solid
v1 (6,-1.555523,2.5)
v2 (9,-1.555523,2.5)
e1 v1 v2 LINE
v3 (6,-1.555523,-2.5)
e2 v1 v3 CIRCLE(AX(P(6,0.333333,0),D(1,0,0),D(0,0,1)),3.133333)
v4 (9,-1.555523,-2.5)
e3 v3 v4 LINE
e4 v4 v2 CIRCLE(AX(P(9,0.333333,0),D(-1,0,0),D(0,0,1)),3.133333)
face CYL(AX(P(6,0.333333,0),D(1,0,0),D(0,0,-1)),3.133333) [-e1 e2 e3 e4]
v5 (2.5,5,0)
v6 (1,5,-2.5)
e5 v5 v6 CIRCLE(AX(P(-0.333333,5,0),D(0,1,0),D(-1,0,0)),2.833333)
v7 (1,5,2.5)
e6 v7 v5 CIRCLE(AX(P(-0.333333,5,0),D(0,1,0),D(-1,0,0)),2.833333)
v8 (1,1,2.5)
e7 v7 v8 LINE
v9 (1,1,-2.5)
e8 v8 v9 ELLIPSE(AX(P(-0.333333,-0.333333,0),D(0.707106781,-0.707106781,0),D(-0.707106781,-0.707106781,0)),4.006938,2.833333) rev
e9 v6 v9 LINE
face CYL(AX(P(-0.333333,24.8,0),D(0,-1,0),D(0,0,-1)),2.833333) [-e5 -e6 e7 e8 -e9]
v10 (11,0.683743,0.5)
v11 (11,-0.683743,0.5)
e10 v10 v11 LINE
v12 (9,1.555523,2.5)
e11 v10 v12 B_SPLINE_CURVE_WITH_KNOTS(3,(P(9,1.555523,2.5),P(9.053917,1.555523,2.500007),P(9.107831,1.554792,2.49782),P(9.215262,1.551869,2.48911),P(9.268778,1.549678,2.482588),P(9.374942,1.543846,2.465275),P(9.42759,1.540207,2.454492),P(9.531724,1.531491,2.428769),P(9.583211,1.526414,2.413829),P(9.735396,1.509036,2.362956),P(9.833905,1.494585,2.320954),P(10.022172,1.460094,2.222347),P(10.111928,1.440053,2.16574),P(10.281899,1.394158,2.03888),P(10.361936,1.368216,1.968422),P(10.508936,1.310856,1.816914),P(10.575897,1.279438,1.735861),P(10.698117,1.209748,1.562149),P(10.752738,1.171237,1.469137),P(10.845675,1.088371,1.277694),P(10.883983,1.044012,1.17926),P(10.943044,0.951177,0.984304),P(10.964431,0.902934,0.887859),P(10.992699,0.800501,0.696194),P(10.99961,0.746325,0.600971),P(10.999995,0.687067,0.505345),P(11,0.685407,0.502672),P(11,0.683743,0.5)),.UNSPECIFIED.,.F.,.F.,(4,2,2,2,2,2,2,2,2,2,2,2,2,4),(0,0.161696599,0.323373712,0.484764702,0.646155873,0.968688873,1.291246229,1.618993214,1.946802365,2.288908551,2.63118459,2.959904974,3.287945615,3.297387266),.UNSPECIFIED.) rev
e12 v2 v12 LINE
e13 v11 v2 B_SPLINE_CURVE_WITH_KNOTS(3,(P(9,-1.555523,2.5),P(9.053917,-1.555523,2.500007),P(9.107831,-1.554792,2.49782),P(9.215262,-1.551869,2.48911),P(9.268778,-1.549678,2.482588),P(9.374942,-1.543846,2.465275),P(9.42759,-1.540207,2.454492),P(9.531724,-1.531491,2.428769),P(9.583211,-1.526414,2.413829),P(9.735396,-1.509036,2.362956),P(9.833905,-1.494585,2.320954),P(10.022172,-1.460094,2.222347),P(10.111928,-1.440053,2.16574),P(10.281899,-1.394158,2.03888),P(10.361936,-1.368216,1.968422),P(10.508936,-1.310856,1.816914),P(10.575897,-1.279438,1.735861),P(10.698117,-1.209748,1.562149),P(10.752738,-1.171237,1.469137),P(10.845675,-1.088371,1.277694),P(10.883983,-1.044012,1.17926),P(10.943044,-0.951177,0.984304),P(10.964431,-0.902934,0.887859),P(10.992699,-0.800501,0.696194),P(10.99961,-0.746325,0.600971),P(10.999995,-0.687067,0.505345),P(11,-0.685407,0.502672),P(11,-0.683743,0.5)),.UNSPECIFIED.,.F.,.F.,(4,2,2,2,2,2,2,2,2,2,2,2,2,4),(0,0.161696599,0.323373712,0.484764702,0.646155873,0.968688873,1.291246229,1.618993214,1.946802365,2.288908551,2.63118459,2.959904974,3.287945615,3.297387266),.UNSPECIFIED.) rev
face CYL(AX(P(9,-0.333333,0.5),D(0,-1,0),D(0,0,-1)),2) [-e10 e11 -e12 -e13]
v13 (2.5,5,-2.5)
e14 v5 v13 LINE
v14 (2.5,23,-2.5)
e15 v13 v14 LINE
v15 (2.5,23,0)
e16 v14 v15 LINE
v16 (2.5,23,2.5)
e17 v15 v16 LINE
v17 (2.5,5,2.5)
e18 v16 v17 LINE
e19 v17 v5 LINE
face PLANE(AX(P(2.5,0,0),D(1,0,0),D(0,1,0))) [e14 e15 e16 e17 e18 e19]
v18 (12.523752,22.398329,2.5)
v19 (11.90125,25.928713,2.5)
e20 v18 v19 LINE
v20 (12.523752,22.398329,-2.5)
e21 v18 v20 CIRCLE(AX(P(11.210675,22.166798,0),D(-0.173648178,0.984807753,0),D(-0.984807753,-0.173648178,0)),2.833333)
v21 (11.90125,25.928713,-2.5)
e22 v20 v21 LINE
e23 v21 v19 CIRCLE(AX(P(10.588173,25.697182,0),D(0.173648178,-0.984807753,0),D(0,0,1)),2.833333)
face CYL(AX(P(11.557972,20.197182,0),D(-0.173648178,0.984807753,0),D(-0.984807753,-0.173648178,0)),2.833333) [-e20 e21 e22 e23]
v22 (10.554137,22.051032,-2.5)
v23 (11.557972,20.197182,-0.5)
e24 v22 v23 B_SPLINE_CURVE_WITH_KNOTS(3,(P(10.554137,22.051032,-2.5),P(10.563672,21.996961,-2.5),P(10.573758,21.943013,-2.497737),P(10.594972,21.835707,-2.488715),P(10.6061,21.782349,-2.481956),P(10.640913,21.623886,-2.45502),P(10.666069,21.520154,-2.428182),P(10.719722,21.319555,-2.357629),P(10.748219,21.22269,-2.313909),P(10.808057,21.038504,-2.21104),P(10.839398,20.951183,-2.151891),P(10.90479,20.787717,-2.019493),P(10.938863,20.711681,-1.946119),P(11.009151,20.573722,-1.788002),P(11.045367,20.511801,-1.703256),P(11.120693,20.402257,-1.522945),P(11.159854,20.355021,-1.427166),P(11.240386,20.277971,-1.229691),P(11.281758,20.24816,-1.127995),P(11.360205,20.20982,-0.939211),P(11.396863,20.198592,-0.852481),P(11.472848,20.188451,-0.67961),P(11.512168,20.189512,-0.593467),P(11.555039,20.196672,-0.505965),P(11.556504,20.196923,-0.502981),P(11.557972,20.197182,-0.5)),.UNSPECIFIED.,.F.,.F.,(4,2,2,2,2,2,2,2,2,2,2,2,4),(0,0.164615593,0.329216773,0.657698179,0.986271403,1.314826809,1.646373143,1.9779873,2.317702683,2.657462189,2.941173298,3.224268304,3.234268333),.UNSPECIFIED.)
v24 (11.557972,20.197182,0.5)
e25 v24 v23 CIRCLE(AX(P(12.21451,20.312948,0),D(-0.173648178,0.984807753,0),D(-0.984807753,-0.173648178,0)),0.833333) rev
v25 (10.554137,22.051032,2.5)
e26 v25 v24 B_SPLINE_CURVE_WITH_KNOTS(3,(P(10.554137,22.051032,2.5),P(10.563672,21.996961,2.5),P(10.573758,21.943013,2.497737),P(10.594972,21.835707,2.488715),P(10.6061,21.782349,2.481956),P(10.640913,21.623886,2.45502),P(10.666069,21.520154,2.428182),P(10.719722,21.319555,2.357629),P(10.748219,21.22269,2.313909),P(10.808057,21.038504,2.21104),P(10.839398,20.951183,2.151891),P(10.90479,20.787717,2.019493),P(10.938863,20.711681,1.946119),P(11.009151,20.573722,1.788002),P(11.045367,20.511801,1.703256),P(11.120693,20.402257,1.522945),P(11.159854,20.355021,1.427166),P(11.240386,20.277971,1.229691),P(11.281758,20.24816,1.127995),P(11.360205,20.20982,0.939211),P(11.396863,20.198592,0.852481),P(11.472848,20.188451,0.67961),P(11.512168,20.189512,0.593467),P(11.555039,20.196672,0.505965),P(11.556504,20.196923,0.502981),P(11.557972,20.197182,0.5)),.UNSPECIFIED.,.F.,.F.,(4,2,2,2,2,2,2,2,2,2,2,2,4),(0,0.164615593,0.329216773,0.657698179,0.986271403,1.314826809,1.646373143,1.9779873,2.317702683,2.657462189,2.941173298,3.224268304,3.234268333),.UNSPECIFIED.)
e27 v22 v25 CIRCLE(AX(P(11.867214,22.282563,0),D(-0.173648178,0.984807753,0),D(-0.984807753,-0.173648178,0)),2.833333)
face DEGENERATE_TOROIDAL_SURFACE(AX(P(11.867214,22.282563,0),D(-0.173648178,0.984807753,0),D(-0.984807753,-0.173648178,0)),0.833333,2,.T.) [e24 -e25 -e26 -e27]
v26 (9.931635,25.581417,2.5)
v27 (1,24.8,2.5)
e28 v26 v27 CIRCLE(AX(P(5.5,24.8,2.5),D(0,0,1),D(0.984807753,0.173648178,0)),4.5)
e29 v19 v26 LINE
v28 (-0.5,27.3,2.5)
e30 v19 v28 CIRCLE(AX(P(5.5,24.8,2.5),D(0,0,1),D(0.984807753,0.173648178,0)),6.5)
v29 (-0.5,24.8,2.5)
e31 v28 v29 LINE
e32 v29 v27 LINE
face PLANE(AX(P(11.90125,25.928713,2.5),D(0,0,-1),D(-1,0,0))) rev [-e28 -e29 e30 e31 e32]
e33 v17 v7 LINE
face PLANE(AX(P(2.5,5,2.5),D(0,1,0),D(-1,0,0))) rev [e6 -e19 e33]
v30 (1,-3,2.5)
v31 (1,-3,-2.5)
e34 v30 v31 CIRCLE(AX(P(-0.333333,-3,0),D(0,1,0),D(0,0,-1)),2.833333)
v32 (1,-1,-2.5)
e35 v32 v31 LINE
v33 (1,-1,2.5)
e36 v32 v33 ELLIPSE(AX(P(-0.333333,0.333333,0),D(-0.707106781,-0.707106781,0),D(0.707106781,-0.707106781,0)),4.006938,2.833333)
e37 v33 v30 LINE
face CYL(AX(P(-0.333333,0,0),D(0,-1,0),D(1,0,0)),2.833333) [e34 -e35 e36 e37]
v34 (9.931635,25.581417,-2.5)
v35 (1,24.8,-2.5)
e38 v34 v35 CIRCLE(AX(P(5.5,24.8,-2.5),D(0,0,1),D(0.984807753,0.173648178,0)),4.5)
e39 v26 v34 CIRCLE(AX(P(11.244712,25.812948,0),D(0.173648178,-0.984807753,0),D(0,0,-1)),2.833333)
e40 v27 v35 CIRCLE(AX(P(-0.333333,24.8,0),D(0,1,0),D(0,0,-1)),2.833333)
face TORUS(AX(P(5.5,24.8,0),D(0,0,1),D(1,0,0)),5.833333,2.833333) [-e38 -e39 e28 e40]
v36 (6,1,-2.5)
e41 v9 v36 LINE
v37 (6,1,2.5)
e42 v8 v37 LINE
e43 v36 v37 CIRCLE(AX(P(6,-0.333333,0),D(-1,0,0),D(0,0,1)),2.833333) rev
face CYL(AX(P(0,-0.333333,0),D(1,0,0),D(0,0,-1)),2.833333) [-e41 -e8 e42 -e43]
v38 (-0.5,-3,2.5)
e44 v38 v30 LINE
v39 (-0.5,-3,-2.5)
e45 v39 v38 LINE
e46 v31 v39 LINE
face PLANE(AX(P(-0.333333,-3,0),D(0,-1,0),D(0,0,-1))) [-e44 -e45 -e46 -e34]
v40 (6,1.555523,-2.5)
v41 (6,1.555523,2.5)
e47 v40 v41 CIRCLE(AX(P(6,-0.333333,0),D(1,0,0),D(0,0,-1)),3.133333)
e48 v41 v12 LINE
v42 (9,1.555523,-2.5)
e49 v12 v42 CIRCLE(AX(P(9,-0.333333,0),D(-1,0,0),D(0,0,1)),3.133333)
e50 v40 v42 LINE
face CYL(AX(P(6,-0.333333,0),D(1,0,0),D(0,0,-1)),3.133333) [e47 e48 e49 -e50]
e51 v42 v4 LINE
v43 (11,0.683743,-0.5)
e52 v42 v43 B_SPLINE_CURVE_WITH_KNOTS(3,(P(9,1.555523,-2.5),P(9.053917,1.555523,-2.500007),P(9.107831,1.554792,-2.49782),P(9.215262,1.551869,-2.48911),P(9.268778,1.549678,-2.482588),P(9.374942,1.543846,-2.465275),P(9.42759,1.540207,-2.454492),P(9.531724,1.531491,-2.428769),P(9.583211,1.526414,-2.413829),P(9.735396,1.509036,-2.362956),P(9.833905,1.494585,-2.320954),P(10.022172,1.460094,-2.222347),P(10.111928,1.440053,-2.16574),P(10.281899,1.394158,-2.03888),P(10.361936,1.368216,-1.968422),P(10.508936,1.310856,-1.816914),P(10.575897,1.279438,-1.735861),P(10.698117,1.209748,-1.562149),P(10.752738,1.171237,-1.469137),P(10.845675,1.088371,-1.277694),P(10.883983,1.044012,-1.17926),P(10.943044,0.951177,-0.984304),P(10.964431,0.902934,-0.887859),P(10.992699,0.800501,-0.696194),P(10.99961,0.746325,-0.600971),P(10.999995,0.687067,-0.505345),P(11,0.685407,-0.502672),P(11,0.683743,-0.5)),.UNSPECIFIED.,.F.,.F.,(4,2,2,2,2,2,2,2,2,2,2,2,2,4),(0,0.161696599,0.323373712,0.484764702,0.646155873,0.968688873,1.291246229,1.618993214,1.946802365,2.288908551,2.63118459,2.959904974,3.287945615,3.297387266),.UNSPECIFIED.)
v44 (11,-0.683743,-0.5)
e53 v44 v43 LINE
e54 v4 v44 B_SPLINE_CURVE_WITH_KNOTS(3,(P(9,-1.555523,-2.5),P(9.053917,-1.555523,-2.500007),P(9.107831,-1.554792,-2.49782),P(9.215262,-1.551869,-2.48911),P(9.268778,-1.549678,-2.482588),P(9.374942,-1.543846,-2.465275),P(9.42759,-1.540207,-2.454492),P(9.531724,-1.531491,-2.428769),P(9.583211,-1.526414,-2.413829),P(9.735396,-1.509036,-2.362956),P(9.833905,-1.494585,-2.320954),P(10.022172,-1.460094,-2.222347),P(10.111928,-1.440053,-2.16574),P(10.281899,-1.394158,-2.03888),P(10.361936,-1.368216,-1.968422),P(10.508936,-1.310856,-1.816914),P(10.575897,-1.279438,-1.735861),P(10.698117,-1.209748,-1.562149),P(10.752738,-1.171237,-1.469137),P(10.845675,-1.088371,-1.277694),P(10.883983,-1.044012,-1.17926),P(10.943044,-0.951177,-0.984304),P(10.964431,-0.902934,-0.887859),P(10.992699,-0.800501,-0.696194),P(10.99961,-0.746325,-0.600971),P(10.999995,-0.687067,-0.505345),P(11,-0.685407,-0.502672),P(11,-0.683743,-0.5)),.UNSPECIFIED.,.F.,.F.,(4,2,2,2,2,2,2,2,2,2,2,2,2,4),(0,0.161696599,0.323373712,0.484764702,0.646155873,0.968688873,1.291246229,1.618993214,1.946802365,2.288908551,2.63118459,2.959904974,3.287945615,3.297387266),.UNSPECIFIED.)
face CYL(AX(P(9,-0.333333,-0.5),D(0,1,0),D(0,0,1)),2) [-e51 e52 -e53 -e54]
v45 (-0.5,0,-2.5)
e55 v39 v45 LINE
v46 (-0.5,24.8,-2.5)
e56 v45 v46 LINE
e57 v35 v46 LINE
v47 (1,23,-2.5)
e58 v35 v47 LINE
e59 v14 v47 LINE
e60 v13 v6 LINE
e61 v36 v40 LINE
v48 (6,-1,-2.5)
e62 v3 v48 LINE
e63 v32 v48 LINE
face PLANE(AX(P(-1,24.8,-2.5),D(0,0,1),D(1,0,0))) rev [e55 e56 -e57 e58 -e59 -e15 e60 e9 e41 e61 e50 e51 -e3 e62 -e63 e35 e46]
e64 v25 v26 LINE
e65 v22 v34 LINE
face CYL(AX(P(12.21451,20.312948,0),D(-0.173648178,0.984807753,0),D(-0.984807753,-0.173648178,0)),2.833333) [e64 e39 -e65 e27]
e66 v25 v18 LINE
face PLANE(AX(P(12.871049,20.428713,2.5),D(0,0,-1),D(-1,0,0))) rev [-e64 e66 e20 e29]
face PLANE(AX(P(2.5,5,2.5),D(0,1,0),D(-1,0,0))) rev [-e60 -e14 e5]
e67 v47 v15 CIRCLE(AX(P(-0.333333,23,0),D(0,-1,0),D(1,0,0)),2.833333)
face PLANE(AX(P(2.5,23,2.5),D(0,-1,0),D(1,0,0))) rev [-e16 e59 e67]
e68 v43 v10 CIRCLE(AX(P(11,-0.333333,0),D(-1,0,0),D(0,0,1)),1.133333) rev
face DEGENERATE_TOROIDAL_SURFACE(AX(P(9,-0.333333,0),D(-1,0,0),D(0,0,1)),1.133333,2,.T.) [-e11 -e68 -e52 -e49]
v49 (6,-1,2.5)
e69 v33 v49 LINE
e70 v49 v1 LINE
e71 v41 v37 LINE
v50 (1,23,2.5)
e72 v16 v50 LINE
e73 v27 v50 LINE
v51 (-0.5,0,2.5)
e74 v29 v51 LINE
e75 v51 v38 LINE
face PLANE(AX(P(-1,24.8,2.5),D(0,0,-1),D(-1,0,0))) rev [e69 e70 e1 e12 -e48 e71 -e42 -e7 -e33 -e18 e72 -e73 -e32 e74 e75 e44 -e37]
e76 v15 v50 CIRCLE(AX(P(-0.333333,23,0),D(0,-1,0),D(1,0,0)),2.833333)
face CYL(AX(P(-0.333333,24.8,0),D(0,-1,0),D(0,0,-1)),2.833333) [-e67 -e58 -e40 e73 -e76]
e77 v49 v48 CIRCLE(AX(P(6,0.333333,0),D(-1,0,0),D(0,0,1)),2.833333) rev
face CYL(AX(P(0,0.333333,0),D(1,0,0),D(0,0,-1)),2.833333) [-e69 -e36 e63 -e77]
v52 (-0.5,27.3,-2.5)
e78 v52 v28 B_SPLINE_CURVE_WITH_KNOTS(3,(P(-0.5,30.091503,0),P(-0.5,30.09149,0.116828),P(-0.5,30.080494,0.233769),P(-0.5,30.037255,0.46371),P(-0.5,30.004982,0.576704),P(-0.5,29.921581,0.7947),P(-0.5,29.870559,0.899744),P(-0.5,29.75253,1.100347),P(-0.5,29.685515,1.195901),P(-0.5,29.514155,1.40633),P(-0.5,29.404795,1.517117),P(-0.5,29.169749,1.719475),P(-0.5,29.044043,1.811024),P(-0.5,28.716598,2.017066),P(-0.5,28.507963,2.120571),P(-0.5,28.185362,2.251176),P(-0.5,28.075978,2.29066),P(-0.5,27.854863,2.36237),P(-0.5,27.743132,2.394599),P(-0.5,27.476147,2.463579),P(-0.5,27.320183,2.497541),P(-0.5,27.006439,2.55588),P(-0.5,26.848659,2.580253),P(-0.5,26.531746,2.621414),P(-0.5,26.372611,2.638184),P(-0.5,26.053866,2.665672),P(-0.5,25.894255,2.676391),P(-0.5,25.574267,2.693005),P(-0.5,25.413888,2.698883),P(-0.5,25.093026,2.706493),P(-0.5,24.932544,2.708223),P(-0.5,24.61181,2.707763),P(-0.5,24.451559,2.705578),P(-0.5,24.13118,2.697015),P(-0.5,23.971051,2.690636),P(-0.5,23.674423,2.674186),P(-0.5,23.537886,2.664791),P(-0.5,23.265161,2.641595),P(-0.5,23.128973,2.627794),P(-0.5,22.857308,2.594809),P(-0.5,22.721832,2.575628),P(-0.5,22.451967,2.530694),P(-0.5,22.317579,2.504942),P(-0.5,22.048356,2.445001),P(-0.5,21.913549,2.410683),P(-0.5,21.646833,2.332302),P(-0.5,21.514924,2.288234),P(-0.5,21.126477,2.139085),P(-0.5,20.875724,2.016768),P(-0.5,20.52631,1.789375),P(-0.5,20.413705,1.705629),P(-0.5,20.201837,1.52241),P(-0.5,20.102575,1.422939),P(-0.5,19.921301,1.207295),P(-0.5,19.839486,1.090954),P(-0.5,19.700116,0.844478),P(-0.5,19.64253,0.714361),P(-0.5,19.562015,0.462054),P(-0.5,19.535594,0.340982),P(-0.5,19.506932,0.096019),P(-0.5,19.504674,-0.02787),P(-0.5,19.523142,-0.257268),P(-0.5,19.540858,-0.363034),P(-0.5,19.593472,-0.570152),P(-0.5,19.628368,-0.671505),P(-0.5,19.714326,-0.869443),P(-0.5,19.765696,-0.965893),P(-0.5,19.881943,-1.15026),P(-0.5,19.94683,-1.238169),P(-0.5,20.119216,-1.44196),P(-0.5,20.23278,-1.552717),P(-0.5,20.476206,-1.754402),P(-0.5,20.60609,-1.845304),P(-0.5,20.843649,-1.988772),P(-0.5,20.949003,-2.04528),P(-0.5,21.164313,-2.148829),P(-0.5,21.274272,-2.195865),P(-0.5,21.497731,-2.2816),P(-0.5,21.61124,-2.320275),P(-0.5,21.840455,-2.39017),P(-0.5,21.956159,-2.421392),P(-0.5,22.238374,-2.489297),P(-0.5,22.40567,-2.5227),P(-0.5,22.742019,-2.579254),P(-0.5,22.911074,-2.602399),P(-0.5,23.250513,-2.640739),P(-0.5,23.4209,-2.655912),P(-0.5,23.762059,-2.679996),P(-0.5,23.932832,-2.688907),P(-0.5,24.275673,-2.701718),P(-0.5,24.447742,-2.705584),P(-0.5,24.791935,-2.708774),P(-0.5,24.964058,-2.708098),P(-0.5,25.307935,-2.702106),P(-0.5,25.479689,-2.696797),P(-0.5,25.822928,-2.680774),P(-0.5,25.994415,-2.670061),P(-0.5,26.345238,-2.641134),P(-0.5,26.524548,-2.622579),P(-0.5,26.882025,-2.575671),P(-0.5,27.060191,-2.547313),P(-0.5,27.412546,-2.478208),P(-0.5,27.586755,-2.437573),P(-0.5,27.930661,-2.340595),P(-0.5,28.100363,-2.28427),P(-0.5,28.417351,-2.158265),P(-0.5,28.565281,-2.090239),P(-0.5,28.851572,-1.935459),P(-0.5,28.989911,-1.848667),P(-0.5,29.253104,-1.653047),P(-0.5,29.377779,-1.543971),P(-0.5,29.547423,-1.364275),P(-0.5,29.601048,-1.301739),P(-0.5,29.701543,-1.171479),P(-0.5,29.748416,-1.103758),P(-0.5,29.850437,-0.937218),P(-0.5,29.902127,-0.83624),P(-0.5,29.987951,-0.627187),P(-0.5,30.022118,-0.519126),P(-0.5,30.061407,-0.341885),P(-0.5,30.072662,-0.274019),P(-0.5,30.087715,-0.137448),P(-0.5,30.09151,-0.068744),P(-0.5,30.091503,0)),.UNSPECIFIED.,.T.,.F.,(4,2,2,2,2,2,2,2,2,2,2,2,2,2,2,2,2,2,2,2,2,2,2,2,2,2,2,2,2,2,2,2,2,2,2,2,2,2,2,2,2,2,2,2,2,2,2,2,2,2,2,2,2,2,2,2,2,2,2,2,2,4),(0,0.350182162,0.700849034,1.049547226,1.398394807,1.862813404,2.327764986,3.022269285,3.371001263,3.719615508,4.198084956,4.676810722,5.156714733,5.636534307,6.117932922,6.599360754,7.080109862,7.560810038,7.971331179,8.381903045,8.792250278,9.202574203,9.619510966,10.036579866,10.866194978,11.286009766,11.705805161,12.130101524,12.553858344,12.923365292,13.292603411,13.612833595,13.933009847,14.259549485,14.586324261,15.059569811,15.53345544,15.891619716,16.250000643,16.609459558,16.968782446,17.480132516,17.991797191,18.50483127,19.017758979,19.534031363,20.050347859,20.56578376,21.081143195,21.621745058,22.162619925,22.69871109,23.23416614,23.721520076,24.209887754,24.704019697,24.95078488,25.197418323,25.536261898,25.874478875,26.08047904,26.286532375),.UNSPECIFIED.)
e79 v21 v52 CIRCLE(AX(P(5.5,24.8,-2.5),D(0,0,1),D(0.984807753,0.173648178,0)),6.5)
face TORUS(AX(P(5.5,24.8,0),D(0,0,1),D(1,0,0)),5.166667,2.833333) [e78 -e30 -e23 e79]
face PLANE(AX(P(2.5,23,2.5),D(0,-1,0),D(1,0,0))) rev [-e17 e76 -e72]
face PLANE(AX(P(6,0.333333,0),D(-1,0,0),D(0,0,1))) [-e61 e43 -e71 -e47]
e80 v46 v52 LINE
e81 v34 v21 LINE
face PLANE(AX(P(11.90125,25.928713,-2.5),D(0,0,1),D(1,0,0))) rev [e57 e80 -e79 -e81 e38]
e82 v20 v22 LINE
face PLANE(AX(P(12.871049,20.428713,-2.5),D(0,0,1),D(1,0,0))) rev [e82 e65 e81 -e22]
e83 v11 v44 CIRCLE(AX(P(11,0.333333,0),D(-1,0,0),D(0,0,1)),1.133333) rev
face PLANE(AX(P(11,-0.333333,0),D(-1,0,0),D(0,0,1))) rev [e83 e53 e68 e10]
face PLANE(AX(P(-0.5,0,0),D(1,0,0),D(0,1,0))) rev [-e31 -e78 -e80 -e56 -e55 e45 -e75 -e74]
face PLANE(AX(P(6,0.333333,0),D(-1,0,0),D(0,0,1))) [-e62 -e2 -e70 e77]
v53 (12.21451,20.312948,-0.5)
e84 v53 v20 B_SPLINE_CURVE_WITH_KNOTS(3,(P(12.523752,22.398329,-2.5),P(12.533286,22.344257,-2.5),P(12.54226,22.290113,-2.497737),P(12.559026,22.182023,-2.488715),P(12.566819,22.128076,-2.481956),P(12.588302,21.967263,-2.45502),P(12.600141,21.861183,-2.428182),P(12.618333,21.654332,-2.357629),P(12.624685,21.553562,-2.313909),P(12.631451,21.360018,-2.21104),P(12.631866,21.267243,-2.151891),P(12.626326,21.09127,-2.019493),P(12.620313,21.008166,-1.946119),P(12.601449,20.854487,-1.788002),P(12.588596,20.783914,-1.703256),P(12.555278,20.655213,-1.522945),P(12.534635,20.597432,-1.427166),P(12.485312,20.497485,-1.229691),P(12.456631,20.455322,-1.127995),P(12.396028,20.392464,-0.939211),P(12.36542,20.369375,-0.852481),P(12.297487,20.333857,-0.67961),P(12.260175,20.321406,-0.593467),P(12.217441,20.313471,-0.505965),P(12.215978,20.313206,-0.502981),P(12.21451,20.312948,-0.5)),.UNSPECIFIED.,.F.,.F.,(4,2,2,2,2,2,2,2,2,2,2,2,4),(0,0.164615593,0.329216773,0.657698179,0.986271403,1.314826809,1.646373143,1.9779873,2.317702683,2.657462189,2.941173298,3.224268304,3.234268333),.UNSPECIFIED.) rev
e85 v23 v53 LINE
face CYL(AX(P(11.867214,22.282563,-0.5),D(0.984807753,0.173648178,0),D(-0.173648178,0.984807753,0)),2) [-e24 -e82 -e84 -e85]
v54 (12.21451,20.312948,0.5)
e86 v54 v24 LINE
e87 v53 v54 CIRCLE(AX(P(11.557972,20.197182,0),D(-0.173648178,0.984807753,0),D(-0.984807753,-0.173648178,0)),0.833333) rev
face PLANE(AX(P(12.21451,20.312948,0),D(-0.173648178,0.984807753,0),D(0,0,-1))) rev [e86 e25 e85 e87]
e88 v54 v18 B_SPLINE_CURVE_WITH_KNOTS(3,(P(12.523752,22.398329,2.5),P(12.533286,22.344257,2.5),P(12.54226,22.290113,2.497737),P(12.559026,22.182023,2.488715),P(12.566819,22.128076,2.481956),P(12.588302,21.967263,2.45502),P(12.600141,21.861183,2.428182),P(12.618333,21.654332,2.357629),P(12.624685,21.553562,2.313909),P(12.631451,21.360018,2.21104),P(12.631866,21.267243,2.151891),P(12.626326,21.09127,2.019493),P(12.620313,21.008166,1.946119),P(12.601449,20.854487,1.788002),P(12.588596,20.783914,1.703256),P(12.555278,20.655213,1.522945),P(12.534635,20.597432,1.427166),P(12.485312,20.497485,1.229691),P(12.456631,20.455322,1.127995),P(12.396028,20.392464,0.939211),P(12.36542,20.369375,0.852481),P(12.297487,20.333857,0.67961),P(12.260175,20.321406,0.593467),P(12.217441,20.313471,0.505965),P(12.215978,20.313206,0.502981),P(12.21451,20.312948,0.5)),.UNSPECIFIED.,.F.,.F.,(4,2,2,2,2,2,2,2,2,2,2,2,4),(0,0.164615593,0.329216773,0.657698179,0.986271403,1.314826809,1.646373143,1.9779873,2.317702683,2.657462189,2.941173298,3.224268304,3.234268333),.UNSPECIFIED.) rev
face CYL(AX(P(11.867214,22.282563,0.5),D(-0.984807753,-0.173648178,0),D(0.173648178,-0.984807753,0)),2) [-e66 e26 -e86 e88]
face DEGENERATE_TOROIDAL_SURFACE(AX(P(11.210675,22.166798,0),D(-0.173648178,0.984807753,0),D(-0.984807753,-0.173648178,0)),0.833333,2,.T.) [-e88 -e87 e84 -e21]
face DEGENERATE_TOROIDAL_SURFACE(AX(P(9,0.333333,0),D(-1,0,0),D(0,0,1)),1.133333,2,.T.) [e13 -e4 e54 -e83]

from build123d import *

# Parameters (mm, degrees)
EXTRUDE_1_DEPTH     = 5
SKETCH_19_W         = 5
SKETCH_19_H         = 18
EXTRUDE_2_DEPTH     = 1.5
FILLET_2_R          = 2
SKETCH_20_W         = 8
SKETCH_20_H         = 40
CUT_EXTRUDE_1_DEPTH = 36.961786675


with BuildPart() as part:
    # 扫描2: sweep along a path in 草图1
    with BuildLine(Plane.XY) as sweep_2_path:
        Line((11.886241035, 20.255064977), (10.916442642, 25.755064977))
        ThreePointArc((10.916442642, 25.755064977), (5.020643415, 30.27907084), (0, 24.8))
        Line((0, 24.8), (0, 0))
        Line((0, 0), (0, -3))
    # 草图13 → 扫描2 (sweep)
    with BuildSketch(Plane(origin=(0, -3, 0), x_dir=(1, 0, 0), z_dir=(0, 1, 0))):
        with BuildLine():
            Line((-1, -2.5), (1, -2.5))
            ThreePointArc((1, -2.5), (2.5, 0), (1, 2.5))
            Line((1, 2.5), (-1, 2.5))
            ThreePointArc((-1, 2.5), (-2.5, 0), (-1, -2.5))
        make_face()
    sweep(path=sweep_2_path.line)

    # 扫描4: sweep along a path in 草图15
    with BuildLine(Plane.XY) as sweep_4_path:
        Line((0, 0), (11, 0))
    # 草图16 → 扫描4 (sweep)
    with BuildSketch(Plane(origin=(11, 0, 0), x_dir=(0, 0, -1), z_dir=(1, 0, 0))):
        with BuildLine():
            Line((-2.5, -1), (-2.5, 1))
            ThreePointArc((-2.5, 1), (0, 2.5), (2.5, 1))
            Line((2.5, 1), (2.5, -1))
            ThreePointArc((2.5, -1), (0, -2.5), (-2.5, -1))
        make_face()
    sweep(path=sweep_4_path.line)

    # 草图17 → 凸台-拉伸1 (add)
    with BuildSketch(Plane(origin=(11, 0, 0), x_dir=(0, 0, -1), z_dir=(1, 0, 0))):
        with BuildLine():
            Line((-2.5, 1.555522876), (-2.5, -1.555522876))
            ThreePointArc((-2.5, -1.555522876), (0, -2.8), (2.5, -1.555522876))
            Line((2.5, -1.555522876), (2.5, 1.555522876))
            ThreePointArc((2.5, 1.555522876), (0, 2.8), (-2.5, 1.555522876))
        make_face()
    extrude(amount=-EXTRUDE_1_DEPTH)

    # 草图19 → 凸台-拉伸2 (add)
    with BuildSketch(Plane(origin=(1, 0, 0), x_dir=(0, 0, -1), z_dir=(1, 0, 0))):
        with Locations((0, 14)):
            Rectangle(SKETCH_19_W, SKETCH_19_H)
    extrude(amount=EXTRUDE_2_DEPTH)

    # 圆角2
    # the kernel refuses this fillet: 2 mm, written as the material it takes off along each edge
    with BuildSketch(Plane(origin=(17.795087554, 21.296954043, 2.5), x_dir=(0, 0, -1), z_dir=(-0.9848077530122092, -0.17364817766692373, 0))) as fillet_2_piece_1:
        with BuildLine():
            CenterArc((FILLET_2_R, -FILLET_2_R), FILLET_2_R, 90, 90)
            Line((0, -FILLET_2_R), (0, 0))
            Line((0, 0), (FILLET_2_R, 0))
        make_face()
    extrude(amount=12, mode=Mode.SUBTRACT)
    with BuildSketch(Plane(origin=(12.214510286, 20.312947703, 0), x_dir=(0.9423506208781959, 0.16616183974819204, -0.29045748456869663), z_dir=(0.2860447827236766, 0.05043741288507259, 0.9568878981667733))) as fillet_2_piece_2:
        with BuildLine():
            CenterArc((2.833333333 - FILLET_2_R, FILLET_2_R), FILLET_2_R, 270, 90)
            Line((2.833333333 - FILLET_2_R, 0), (2.833333333, 0))
            Line((2.833333333, 0), (2.833333333, FILLET_2_R))
        make_face()
    revolve(axis=Axis((12.214510286, 20.312947703, 0), (-0.173648177666923, 0.9848077530122094, 0)), revolution_arc=326.229306127, mode=Mode.SUBTRACT)
    with BuildSketch(Plane(origin=(5.977394517, 19.213175911, -2.5), x_dir=(-0.17364817766692373, 0.9848077530122092, 0), z_dir=(0.9848077530122092, 0.17364817766692373, 0))) as fillet_2_piece_3:
        with BuildLine():
            CenterArc((FILLET_2_R, FILLET_2_R), FILLET_2_R, 180, 90)
            Line((0, FILLET_2_R), (0, 0))
            Line((0, 0), (FILLET_2_R, 0))
        make_face()
    extrude(amount=12, mode=Mode.SUBTRACT)
    with BuildSketch(Plane(origin=(11, -6.555522876, 2.5), x_dir=(0, 0, -1), z_dir=(0, 1, 0))) as fillet_2_piece_4:
        with BuildLine():
            CenterArc((FILLET_2_R, FILLET_2_R), FILLET_2_R, 180, 90)
            Line((0, FILLET_2_R), (0, 0))
            Line((0, 0), (FILLET_2_R, 0))
        make_face()
    extrude(amount=13.111045751, mode=Mode.SUBTRACT)
    with BuildSketch(Plane(origin=(11, 6.555522876, -2.5), x_dir=(-1, 0, 0), z_dir=(0, -1, 0))) as fillet_2_piece_5:
        with BuildLine():
            CenterArc((FILLET_2_R, -FILLET_2_R), FILLET_2_R, 90, 90)
            Line((0, -FILLET_2_R), (0, 0))
            Line((0, 0), (FILLET_2_R, 0))
        make_face()
    extrude(amount=13.111045751, mode=Mode.SUBTRACT)
    with BuildSketch(Plane(origin=(11, -0.333333333, 0), x_dir=(0, -0.8131785022115455, -0.582014367125922), z_dir=(0, -0.582014367125922, 0.8131785022115455))) as fillet_2_piece_6:
        with BuildLine():
            CenterArc((3.133333333 - FILLET_2_R, -FILLET_2_R), FILLET_2_R, 0, 90)
            Line((3.133333333, -FILLET_2_R), (3.133333333, 0))
            Line((3.133333333, 0), (3.133333333 - FILLET_2_R, 0))
        make_face()
    revolve(axis=Axis((11, -0.333333333, 0), (1, 0, 0)), revolution_arc=288.815304863, mode=Mode.SUBTRACT)
    with BuildSketch(Plane(origin=(11, 0.333333333, 0), x_dir=(0, 0.8131785022115376, 0.5820143671259329), z_dir=(0, 0.5820143671259329, -0.8131785022115376))) as fillet_2_piece_7:
        with BuildLine():
            CenterArc((3.133333333 - FILLET_2_R, -FILLET_2_R), FILLET_2_R, 0, 90)
            Line((3.133333333 - FILLET_2_R, 0), (3.133333333, 0))
            Line((3.133333333, 0), (3.133333333, -FILLET_2_R))
        make_face()
    revolve(axis=Axis((11, 0.333333333, 0), (1, 0, 0)), revolution_arc=288.815304863, mode=Mode.SUBTRACT)
    with BuildSketch(Plane(origin=(11.557971784, 20.197182251, 0), x_dir=(-0.9423506208781961, -0.16616183974819207, 0.2904574845686964), z_dir=(-0.2860447827236764, -0.05043741288507257, -0.9568878981667737))) as fillet_2_piece_8:
        with BuildLine():
            CenterArc((2.833333333 - FILLET_2_R, FILLET_2_R), FILLET_2_R, 270, 90)
            Line((2.833333333, FILLET_2_R), (2.833333333, 0))
            Line((2.833333333, 0), (2.833333333 - FILLET_2_R, 0))
        make_face()
    revolve(axis=Axis((11.557971784, 20.197182251, 0), (-0.17364817766692306, 0.9848077530122095, 0)), revolution_arc=326.229306127, mode=Mode.SUBTRACT)

    # 草图20 → 切除-拉伸1 (cut, through all)
    with BuildSketch(Plane(origin=(-0.5, 0, 0), x_dir=(0, 0, -1), z_dir=(1, 0, 0))):
        with Locations((0, 16)):
            Rectangle(SKETCH_20_W, SKETCH_20_H)
    extrude(amount=-CUT_EXTRUDE_1_DEPTH, mode=Mode.SUBTRACT)


solid = part.part
